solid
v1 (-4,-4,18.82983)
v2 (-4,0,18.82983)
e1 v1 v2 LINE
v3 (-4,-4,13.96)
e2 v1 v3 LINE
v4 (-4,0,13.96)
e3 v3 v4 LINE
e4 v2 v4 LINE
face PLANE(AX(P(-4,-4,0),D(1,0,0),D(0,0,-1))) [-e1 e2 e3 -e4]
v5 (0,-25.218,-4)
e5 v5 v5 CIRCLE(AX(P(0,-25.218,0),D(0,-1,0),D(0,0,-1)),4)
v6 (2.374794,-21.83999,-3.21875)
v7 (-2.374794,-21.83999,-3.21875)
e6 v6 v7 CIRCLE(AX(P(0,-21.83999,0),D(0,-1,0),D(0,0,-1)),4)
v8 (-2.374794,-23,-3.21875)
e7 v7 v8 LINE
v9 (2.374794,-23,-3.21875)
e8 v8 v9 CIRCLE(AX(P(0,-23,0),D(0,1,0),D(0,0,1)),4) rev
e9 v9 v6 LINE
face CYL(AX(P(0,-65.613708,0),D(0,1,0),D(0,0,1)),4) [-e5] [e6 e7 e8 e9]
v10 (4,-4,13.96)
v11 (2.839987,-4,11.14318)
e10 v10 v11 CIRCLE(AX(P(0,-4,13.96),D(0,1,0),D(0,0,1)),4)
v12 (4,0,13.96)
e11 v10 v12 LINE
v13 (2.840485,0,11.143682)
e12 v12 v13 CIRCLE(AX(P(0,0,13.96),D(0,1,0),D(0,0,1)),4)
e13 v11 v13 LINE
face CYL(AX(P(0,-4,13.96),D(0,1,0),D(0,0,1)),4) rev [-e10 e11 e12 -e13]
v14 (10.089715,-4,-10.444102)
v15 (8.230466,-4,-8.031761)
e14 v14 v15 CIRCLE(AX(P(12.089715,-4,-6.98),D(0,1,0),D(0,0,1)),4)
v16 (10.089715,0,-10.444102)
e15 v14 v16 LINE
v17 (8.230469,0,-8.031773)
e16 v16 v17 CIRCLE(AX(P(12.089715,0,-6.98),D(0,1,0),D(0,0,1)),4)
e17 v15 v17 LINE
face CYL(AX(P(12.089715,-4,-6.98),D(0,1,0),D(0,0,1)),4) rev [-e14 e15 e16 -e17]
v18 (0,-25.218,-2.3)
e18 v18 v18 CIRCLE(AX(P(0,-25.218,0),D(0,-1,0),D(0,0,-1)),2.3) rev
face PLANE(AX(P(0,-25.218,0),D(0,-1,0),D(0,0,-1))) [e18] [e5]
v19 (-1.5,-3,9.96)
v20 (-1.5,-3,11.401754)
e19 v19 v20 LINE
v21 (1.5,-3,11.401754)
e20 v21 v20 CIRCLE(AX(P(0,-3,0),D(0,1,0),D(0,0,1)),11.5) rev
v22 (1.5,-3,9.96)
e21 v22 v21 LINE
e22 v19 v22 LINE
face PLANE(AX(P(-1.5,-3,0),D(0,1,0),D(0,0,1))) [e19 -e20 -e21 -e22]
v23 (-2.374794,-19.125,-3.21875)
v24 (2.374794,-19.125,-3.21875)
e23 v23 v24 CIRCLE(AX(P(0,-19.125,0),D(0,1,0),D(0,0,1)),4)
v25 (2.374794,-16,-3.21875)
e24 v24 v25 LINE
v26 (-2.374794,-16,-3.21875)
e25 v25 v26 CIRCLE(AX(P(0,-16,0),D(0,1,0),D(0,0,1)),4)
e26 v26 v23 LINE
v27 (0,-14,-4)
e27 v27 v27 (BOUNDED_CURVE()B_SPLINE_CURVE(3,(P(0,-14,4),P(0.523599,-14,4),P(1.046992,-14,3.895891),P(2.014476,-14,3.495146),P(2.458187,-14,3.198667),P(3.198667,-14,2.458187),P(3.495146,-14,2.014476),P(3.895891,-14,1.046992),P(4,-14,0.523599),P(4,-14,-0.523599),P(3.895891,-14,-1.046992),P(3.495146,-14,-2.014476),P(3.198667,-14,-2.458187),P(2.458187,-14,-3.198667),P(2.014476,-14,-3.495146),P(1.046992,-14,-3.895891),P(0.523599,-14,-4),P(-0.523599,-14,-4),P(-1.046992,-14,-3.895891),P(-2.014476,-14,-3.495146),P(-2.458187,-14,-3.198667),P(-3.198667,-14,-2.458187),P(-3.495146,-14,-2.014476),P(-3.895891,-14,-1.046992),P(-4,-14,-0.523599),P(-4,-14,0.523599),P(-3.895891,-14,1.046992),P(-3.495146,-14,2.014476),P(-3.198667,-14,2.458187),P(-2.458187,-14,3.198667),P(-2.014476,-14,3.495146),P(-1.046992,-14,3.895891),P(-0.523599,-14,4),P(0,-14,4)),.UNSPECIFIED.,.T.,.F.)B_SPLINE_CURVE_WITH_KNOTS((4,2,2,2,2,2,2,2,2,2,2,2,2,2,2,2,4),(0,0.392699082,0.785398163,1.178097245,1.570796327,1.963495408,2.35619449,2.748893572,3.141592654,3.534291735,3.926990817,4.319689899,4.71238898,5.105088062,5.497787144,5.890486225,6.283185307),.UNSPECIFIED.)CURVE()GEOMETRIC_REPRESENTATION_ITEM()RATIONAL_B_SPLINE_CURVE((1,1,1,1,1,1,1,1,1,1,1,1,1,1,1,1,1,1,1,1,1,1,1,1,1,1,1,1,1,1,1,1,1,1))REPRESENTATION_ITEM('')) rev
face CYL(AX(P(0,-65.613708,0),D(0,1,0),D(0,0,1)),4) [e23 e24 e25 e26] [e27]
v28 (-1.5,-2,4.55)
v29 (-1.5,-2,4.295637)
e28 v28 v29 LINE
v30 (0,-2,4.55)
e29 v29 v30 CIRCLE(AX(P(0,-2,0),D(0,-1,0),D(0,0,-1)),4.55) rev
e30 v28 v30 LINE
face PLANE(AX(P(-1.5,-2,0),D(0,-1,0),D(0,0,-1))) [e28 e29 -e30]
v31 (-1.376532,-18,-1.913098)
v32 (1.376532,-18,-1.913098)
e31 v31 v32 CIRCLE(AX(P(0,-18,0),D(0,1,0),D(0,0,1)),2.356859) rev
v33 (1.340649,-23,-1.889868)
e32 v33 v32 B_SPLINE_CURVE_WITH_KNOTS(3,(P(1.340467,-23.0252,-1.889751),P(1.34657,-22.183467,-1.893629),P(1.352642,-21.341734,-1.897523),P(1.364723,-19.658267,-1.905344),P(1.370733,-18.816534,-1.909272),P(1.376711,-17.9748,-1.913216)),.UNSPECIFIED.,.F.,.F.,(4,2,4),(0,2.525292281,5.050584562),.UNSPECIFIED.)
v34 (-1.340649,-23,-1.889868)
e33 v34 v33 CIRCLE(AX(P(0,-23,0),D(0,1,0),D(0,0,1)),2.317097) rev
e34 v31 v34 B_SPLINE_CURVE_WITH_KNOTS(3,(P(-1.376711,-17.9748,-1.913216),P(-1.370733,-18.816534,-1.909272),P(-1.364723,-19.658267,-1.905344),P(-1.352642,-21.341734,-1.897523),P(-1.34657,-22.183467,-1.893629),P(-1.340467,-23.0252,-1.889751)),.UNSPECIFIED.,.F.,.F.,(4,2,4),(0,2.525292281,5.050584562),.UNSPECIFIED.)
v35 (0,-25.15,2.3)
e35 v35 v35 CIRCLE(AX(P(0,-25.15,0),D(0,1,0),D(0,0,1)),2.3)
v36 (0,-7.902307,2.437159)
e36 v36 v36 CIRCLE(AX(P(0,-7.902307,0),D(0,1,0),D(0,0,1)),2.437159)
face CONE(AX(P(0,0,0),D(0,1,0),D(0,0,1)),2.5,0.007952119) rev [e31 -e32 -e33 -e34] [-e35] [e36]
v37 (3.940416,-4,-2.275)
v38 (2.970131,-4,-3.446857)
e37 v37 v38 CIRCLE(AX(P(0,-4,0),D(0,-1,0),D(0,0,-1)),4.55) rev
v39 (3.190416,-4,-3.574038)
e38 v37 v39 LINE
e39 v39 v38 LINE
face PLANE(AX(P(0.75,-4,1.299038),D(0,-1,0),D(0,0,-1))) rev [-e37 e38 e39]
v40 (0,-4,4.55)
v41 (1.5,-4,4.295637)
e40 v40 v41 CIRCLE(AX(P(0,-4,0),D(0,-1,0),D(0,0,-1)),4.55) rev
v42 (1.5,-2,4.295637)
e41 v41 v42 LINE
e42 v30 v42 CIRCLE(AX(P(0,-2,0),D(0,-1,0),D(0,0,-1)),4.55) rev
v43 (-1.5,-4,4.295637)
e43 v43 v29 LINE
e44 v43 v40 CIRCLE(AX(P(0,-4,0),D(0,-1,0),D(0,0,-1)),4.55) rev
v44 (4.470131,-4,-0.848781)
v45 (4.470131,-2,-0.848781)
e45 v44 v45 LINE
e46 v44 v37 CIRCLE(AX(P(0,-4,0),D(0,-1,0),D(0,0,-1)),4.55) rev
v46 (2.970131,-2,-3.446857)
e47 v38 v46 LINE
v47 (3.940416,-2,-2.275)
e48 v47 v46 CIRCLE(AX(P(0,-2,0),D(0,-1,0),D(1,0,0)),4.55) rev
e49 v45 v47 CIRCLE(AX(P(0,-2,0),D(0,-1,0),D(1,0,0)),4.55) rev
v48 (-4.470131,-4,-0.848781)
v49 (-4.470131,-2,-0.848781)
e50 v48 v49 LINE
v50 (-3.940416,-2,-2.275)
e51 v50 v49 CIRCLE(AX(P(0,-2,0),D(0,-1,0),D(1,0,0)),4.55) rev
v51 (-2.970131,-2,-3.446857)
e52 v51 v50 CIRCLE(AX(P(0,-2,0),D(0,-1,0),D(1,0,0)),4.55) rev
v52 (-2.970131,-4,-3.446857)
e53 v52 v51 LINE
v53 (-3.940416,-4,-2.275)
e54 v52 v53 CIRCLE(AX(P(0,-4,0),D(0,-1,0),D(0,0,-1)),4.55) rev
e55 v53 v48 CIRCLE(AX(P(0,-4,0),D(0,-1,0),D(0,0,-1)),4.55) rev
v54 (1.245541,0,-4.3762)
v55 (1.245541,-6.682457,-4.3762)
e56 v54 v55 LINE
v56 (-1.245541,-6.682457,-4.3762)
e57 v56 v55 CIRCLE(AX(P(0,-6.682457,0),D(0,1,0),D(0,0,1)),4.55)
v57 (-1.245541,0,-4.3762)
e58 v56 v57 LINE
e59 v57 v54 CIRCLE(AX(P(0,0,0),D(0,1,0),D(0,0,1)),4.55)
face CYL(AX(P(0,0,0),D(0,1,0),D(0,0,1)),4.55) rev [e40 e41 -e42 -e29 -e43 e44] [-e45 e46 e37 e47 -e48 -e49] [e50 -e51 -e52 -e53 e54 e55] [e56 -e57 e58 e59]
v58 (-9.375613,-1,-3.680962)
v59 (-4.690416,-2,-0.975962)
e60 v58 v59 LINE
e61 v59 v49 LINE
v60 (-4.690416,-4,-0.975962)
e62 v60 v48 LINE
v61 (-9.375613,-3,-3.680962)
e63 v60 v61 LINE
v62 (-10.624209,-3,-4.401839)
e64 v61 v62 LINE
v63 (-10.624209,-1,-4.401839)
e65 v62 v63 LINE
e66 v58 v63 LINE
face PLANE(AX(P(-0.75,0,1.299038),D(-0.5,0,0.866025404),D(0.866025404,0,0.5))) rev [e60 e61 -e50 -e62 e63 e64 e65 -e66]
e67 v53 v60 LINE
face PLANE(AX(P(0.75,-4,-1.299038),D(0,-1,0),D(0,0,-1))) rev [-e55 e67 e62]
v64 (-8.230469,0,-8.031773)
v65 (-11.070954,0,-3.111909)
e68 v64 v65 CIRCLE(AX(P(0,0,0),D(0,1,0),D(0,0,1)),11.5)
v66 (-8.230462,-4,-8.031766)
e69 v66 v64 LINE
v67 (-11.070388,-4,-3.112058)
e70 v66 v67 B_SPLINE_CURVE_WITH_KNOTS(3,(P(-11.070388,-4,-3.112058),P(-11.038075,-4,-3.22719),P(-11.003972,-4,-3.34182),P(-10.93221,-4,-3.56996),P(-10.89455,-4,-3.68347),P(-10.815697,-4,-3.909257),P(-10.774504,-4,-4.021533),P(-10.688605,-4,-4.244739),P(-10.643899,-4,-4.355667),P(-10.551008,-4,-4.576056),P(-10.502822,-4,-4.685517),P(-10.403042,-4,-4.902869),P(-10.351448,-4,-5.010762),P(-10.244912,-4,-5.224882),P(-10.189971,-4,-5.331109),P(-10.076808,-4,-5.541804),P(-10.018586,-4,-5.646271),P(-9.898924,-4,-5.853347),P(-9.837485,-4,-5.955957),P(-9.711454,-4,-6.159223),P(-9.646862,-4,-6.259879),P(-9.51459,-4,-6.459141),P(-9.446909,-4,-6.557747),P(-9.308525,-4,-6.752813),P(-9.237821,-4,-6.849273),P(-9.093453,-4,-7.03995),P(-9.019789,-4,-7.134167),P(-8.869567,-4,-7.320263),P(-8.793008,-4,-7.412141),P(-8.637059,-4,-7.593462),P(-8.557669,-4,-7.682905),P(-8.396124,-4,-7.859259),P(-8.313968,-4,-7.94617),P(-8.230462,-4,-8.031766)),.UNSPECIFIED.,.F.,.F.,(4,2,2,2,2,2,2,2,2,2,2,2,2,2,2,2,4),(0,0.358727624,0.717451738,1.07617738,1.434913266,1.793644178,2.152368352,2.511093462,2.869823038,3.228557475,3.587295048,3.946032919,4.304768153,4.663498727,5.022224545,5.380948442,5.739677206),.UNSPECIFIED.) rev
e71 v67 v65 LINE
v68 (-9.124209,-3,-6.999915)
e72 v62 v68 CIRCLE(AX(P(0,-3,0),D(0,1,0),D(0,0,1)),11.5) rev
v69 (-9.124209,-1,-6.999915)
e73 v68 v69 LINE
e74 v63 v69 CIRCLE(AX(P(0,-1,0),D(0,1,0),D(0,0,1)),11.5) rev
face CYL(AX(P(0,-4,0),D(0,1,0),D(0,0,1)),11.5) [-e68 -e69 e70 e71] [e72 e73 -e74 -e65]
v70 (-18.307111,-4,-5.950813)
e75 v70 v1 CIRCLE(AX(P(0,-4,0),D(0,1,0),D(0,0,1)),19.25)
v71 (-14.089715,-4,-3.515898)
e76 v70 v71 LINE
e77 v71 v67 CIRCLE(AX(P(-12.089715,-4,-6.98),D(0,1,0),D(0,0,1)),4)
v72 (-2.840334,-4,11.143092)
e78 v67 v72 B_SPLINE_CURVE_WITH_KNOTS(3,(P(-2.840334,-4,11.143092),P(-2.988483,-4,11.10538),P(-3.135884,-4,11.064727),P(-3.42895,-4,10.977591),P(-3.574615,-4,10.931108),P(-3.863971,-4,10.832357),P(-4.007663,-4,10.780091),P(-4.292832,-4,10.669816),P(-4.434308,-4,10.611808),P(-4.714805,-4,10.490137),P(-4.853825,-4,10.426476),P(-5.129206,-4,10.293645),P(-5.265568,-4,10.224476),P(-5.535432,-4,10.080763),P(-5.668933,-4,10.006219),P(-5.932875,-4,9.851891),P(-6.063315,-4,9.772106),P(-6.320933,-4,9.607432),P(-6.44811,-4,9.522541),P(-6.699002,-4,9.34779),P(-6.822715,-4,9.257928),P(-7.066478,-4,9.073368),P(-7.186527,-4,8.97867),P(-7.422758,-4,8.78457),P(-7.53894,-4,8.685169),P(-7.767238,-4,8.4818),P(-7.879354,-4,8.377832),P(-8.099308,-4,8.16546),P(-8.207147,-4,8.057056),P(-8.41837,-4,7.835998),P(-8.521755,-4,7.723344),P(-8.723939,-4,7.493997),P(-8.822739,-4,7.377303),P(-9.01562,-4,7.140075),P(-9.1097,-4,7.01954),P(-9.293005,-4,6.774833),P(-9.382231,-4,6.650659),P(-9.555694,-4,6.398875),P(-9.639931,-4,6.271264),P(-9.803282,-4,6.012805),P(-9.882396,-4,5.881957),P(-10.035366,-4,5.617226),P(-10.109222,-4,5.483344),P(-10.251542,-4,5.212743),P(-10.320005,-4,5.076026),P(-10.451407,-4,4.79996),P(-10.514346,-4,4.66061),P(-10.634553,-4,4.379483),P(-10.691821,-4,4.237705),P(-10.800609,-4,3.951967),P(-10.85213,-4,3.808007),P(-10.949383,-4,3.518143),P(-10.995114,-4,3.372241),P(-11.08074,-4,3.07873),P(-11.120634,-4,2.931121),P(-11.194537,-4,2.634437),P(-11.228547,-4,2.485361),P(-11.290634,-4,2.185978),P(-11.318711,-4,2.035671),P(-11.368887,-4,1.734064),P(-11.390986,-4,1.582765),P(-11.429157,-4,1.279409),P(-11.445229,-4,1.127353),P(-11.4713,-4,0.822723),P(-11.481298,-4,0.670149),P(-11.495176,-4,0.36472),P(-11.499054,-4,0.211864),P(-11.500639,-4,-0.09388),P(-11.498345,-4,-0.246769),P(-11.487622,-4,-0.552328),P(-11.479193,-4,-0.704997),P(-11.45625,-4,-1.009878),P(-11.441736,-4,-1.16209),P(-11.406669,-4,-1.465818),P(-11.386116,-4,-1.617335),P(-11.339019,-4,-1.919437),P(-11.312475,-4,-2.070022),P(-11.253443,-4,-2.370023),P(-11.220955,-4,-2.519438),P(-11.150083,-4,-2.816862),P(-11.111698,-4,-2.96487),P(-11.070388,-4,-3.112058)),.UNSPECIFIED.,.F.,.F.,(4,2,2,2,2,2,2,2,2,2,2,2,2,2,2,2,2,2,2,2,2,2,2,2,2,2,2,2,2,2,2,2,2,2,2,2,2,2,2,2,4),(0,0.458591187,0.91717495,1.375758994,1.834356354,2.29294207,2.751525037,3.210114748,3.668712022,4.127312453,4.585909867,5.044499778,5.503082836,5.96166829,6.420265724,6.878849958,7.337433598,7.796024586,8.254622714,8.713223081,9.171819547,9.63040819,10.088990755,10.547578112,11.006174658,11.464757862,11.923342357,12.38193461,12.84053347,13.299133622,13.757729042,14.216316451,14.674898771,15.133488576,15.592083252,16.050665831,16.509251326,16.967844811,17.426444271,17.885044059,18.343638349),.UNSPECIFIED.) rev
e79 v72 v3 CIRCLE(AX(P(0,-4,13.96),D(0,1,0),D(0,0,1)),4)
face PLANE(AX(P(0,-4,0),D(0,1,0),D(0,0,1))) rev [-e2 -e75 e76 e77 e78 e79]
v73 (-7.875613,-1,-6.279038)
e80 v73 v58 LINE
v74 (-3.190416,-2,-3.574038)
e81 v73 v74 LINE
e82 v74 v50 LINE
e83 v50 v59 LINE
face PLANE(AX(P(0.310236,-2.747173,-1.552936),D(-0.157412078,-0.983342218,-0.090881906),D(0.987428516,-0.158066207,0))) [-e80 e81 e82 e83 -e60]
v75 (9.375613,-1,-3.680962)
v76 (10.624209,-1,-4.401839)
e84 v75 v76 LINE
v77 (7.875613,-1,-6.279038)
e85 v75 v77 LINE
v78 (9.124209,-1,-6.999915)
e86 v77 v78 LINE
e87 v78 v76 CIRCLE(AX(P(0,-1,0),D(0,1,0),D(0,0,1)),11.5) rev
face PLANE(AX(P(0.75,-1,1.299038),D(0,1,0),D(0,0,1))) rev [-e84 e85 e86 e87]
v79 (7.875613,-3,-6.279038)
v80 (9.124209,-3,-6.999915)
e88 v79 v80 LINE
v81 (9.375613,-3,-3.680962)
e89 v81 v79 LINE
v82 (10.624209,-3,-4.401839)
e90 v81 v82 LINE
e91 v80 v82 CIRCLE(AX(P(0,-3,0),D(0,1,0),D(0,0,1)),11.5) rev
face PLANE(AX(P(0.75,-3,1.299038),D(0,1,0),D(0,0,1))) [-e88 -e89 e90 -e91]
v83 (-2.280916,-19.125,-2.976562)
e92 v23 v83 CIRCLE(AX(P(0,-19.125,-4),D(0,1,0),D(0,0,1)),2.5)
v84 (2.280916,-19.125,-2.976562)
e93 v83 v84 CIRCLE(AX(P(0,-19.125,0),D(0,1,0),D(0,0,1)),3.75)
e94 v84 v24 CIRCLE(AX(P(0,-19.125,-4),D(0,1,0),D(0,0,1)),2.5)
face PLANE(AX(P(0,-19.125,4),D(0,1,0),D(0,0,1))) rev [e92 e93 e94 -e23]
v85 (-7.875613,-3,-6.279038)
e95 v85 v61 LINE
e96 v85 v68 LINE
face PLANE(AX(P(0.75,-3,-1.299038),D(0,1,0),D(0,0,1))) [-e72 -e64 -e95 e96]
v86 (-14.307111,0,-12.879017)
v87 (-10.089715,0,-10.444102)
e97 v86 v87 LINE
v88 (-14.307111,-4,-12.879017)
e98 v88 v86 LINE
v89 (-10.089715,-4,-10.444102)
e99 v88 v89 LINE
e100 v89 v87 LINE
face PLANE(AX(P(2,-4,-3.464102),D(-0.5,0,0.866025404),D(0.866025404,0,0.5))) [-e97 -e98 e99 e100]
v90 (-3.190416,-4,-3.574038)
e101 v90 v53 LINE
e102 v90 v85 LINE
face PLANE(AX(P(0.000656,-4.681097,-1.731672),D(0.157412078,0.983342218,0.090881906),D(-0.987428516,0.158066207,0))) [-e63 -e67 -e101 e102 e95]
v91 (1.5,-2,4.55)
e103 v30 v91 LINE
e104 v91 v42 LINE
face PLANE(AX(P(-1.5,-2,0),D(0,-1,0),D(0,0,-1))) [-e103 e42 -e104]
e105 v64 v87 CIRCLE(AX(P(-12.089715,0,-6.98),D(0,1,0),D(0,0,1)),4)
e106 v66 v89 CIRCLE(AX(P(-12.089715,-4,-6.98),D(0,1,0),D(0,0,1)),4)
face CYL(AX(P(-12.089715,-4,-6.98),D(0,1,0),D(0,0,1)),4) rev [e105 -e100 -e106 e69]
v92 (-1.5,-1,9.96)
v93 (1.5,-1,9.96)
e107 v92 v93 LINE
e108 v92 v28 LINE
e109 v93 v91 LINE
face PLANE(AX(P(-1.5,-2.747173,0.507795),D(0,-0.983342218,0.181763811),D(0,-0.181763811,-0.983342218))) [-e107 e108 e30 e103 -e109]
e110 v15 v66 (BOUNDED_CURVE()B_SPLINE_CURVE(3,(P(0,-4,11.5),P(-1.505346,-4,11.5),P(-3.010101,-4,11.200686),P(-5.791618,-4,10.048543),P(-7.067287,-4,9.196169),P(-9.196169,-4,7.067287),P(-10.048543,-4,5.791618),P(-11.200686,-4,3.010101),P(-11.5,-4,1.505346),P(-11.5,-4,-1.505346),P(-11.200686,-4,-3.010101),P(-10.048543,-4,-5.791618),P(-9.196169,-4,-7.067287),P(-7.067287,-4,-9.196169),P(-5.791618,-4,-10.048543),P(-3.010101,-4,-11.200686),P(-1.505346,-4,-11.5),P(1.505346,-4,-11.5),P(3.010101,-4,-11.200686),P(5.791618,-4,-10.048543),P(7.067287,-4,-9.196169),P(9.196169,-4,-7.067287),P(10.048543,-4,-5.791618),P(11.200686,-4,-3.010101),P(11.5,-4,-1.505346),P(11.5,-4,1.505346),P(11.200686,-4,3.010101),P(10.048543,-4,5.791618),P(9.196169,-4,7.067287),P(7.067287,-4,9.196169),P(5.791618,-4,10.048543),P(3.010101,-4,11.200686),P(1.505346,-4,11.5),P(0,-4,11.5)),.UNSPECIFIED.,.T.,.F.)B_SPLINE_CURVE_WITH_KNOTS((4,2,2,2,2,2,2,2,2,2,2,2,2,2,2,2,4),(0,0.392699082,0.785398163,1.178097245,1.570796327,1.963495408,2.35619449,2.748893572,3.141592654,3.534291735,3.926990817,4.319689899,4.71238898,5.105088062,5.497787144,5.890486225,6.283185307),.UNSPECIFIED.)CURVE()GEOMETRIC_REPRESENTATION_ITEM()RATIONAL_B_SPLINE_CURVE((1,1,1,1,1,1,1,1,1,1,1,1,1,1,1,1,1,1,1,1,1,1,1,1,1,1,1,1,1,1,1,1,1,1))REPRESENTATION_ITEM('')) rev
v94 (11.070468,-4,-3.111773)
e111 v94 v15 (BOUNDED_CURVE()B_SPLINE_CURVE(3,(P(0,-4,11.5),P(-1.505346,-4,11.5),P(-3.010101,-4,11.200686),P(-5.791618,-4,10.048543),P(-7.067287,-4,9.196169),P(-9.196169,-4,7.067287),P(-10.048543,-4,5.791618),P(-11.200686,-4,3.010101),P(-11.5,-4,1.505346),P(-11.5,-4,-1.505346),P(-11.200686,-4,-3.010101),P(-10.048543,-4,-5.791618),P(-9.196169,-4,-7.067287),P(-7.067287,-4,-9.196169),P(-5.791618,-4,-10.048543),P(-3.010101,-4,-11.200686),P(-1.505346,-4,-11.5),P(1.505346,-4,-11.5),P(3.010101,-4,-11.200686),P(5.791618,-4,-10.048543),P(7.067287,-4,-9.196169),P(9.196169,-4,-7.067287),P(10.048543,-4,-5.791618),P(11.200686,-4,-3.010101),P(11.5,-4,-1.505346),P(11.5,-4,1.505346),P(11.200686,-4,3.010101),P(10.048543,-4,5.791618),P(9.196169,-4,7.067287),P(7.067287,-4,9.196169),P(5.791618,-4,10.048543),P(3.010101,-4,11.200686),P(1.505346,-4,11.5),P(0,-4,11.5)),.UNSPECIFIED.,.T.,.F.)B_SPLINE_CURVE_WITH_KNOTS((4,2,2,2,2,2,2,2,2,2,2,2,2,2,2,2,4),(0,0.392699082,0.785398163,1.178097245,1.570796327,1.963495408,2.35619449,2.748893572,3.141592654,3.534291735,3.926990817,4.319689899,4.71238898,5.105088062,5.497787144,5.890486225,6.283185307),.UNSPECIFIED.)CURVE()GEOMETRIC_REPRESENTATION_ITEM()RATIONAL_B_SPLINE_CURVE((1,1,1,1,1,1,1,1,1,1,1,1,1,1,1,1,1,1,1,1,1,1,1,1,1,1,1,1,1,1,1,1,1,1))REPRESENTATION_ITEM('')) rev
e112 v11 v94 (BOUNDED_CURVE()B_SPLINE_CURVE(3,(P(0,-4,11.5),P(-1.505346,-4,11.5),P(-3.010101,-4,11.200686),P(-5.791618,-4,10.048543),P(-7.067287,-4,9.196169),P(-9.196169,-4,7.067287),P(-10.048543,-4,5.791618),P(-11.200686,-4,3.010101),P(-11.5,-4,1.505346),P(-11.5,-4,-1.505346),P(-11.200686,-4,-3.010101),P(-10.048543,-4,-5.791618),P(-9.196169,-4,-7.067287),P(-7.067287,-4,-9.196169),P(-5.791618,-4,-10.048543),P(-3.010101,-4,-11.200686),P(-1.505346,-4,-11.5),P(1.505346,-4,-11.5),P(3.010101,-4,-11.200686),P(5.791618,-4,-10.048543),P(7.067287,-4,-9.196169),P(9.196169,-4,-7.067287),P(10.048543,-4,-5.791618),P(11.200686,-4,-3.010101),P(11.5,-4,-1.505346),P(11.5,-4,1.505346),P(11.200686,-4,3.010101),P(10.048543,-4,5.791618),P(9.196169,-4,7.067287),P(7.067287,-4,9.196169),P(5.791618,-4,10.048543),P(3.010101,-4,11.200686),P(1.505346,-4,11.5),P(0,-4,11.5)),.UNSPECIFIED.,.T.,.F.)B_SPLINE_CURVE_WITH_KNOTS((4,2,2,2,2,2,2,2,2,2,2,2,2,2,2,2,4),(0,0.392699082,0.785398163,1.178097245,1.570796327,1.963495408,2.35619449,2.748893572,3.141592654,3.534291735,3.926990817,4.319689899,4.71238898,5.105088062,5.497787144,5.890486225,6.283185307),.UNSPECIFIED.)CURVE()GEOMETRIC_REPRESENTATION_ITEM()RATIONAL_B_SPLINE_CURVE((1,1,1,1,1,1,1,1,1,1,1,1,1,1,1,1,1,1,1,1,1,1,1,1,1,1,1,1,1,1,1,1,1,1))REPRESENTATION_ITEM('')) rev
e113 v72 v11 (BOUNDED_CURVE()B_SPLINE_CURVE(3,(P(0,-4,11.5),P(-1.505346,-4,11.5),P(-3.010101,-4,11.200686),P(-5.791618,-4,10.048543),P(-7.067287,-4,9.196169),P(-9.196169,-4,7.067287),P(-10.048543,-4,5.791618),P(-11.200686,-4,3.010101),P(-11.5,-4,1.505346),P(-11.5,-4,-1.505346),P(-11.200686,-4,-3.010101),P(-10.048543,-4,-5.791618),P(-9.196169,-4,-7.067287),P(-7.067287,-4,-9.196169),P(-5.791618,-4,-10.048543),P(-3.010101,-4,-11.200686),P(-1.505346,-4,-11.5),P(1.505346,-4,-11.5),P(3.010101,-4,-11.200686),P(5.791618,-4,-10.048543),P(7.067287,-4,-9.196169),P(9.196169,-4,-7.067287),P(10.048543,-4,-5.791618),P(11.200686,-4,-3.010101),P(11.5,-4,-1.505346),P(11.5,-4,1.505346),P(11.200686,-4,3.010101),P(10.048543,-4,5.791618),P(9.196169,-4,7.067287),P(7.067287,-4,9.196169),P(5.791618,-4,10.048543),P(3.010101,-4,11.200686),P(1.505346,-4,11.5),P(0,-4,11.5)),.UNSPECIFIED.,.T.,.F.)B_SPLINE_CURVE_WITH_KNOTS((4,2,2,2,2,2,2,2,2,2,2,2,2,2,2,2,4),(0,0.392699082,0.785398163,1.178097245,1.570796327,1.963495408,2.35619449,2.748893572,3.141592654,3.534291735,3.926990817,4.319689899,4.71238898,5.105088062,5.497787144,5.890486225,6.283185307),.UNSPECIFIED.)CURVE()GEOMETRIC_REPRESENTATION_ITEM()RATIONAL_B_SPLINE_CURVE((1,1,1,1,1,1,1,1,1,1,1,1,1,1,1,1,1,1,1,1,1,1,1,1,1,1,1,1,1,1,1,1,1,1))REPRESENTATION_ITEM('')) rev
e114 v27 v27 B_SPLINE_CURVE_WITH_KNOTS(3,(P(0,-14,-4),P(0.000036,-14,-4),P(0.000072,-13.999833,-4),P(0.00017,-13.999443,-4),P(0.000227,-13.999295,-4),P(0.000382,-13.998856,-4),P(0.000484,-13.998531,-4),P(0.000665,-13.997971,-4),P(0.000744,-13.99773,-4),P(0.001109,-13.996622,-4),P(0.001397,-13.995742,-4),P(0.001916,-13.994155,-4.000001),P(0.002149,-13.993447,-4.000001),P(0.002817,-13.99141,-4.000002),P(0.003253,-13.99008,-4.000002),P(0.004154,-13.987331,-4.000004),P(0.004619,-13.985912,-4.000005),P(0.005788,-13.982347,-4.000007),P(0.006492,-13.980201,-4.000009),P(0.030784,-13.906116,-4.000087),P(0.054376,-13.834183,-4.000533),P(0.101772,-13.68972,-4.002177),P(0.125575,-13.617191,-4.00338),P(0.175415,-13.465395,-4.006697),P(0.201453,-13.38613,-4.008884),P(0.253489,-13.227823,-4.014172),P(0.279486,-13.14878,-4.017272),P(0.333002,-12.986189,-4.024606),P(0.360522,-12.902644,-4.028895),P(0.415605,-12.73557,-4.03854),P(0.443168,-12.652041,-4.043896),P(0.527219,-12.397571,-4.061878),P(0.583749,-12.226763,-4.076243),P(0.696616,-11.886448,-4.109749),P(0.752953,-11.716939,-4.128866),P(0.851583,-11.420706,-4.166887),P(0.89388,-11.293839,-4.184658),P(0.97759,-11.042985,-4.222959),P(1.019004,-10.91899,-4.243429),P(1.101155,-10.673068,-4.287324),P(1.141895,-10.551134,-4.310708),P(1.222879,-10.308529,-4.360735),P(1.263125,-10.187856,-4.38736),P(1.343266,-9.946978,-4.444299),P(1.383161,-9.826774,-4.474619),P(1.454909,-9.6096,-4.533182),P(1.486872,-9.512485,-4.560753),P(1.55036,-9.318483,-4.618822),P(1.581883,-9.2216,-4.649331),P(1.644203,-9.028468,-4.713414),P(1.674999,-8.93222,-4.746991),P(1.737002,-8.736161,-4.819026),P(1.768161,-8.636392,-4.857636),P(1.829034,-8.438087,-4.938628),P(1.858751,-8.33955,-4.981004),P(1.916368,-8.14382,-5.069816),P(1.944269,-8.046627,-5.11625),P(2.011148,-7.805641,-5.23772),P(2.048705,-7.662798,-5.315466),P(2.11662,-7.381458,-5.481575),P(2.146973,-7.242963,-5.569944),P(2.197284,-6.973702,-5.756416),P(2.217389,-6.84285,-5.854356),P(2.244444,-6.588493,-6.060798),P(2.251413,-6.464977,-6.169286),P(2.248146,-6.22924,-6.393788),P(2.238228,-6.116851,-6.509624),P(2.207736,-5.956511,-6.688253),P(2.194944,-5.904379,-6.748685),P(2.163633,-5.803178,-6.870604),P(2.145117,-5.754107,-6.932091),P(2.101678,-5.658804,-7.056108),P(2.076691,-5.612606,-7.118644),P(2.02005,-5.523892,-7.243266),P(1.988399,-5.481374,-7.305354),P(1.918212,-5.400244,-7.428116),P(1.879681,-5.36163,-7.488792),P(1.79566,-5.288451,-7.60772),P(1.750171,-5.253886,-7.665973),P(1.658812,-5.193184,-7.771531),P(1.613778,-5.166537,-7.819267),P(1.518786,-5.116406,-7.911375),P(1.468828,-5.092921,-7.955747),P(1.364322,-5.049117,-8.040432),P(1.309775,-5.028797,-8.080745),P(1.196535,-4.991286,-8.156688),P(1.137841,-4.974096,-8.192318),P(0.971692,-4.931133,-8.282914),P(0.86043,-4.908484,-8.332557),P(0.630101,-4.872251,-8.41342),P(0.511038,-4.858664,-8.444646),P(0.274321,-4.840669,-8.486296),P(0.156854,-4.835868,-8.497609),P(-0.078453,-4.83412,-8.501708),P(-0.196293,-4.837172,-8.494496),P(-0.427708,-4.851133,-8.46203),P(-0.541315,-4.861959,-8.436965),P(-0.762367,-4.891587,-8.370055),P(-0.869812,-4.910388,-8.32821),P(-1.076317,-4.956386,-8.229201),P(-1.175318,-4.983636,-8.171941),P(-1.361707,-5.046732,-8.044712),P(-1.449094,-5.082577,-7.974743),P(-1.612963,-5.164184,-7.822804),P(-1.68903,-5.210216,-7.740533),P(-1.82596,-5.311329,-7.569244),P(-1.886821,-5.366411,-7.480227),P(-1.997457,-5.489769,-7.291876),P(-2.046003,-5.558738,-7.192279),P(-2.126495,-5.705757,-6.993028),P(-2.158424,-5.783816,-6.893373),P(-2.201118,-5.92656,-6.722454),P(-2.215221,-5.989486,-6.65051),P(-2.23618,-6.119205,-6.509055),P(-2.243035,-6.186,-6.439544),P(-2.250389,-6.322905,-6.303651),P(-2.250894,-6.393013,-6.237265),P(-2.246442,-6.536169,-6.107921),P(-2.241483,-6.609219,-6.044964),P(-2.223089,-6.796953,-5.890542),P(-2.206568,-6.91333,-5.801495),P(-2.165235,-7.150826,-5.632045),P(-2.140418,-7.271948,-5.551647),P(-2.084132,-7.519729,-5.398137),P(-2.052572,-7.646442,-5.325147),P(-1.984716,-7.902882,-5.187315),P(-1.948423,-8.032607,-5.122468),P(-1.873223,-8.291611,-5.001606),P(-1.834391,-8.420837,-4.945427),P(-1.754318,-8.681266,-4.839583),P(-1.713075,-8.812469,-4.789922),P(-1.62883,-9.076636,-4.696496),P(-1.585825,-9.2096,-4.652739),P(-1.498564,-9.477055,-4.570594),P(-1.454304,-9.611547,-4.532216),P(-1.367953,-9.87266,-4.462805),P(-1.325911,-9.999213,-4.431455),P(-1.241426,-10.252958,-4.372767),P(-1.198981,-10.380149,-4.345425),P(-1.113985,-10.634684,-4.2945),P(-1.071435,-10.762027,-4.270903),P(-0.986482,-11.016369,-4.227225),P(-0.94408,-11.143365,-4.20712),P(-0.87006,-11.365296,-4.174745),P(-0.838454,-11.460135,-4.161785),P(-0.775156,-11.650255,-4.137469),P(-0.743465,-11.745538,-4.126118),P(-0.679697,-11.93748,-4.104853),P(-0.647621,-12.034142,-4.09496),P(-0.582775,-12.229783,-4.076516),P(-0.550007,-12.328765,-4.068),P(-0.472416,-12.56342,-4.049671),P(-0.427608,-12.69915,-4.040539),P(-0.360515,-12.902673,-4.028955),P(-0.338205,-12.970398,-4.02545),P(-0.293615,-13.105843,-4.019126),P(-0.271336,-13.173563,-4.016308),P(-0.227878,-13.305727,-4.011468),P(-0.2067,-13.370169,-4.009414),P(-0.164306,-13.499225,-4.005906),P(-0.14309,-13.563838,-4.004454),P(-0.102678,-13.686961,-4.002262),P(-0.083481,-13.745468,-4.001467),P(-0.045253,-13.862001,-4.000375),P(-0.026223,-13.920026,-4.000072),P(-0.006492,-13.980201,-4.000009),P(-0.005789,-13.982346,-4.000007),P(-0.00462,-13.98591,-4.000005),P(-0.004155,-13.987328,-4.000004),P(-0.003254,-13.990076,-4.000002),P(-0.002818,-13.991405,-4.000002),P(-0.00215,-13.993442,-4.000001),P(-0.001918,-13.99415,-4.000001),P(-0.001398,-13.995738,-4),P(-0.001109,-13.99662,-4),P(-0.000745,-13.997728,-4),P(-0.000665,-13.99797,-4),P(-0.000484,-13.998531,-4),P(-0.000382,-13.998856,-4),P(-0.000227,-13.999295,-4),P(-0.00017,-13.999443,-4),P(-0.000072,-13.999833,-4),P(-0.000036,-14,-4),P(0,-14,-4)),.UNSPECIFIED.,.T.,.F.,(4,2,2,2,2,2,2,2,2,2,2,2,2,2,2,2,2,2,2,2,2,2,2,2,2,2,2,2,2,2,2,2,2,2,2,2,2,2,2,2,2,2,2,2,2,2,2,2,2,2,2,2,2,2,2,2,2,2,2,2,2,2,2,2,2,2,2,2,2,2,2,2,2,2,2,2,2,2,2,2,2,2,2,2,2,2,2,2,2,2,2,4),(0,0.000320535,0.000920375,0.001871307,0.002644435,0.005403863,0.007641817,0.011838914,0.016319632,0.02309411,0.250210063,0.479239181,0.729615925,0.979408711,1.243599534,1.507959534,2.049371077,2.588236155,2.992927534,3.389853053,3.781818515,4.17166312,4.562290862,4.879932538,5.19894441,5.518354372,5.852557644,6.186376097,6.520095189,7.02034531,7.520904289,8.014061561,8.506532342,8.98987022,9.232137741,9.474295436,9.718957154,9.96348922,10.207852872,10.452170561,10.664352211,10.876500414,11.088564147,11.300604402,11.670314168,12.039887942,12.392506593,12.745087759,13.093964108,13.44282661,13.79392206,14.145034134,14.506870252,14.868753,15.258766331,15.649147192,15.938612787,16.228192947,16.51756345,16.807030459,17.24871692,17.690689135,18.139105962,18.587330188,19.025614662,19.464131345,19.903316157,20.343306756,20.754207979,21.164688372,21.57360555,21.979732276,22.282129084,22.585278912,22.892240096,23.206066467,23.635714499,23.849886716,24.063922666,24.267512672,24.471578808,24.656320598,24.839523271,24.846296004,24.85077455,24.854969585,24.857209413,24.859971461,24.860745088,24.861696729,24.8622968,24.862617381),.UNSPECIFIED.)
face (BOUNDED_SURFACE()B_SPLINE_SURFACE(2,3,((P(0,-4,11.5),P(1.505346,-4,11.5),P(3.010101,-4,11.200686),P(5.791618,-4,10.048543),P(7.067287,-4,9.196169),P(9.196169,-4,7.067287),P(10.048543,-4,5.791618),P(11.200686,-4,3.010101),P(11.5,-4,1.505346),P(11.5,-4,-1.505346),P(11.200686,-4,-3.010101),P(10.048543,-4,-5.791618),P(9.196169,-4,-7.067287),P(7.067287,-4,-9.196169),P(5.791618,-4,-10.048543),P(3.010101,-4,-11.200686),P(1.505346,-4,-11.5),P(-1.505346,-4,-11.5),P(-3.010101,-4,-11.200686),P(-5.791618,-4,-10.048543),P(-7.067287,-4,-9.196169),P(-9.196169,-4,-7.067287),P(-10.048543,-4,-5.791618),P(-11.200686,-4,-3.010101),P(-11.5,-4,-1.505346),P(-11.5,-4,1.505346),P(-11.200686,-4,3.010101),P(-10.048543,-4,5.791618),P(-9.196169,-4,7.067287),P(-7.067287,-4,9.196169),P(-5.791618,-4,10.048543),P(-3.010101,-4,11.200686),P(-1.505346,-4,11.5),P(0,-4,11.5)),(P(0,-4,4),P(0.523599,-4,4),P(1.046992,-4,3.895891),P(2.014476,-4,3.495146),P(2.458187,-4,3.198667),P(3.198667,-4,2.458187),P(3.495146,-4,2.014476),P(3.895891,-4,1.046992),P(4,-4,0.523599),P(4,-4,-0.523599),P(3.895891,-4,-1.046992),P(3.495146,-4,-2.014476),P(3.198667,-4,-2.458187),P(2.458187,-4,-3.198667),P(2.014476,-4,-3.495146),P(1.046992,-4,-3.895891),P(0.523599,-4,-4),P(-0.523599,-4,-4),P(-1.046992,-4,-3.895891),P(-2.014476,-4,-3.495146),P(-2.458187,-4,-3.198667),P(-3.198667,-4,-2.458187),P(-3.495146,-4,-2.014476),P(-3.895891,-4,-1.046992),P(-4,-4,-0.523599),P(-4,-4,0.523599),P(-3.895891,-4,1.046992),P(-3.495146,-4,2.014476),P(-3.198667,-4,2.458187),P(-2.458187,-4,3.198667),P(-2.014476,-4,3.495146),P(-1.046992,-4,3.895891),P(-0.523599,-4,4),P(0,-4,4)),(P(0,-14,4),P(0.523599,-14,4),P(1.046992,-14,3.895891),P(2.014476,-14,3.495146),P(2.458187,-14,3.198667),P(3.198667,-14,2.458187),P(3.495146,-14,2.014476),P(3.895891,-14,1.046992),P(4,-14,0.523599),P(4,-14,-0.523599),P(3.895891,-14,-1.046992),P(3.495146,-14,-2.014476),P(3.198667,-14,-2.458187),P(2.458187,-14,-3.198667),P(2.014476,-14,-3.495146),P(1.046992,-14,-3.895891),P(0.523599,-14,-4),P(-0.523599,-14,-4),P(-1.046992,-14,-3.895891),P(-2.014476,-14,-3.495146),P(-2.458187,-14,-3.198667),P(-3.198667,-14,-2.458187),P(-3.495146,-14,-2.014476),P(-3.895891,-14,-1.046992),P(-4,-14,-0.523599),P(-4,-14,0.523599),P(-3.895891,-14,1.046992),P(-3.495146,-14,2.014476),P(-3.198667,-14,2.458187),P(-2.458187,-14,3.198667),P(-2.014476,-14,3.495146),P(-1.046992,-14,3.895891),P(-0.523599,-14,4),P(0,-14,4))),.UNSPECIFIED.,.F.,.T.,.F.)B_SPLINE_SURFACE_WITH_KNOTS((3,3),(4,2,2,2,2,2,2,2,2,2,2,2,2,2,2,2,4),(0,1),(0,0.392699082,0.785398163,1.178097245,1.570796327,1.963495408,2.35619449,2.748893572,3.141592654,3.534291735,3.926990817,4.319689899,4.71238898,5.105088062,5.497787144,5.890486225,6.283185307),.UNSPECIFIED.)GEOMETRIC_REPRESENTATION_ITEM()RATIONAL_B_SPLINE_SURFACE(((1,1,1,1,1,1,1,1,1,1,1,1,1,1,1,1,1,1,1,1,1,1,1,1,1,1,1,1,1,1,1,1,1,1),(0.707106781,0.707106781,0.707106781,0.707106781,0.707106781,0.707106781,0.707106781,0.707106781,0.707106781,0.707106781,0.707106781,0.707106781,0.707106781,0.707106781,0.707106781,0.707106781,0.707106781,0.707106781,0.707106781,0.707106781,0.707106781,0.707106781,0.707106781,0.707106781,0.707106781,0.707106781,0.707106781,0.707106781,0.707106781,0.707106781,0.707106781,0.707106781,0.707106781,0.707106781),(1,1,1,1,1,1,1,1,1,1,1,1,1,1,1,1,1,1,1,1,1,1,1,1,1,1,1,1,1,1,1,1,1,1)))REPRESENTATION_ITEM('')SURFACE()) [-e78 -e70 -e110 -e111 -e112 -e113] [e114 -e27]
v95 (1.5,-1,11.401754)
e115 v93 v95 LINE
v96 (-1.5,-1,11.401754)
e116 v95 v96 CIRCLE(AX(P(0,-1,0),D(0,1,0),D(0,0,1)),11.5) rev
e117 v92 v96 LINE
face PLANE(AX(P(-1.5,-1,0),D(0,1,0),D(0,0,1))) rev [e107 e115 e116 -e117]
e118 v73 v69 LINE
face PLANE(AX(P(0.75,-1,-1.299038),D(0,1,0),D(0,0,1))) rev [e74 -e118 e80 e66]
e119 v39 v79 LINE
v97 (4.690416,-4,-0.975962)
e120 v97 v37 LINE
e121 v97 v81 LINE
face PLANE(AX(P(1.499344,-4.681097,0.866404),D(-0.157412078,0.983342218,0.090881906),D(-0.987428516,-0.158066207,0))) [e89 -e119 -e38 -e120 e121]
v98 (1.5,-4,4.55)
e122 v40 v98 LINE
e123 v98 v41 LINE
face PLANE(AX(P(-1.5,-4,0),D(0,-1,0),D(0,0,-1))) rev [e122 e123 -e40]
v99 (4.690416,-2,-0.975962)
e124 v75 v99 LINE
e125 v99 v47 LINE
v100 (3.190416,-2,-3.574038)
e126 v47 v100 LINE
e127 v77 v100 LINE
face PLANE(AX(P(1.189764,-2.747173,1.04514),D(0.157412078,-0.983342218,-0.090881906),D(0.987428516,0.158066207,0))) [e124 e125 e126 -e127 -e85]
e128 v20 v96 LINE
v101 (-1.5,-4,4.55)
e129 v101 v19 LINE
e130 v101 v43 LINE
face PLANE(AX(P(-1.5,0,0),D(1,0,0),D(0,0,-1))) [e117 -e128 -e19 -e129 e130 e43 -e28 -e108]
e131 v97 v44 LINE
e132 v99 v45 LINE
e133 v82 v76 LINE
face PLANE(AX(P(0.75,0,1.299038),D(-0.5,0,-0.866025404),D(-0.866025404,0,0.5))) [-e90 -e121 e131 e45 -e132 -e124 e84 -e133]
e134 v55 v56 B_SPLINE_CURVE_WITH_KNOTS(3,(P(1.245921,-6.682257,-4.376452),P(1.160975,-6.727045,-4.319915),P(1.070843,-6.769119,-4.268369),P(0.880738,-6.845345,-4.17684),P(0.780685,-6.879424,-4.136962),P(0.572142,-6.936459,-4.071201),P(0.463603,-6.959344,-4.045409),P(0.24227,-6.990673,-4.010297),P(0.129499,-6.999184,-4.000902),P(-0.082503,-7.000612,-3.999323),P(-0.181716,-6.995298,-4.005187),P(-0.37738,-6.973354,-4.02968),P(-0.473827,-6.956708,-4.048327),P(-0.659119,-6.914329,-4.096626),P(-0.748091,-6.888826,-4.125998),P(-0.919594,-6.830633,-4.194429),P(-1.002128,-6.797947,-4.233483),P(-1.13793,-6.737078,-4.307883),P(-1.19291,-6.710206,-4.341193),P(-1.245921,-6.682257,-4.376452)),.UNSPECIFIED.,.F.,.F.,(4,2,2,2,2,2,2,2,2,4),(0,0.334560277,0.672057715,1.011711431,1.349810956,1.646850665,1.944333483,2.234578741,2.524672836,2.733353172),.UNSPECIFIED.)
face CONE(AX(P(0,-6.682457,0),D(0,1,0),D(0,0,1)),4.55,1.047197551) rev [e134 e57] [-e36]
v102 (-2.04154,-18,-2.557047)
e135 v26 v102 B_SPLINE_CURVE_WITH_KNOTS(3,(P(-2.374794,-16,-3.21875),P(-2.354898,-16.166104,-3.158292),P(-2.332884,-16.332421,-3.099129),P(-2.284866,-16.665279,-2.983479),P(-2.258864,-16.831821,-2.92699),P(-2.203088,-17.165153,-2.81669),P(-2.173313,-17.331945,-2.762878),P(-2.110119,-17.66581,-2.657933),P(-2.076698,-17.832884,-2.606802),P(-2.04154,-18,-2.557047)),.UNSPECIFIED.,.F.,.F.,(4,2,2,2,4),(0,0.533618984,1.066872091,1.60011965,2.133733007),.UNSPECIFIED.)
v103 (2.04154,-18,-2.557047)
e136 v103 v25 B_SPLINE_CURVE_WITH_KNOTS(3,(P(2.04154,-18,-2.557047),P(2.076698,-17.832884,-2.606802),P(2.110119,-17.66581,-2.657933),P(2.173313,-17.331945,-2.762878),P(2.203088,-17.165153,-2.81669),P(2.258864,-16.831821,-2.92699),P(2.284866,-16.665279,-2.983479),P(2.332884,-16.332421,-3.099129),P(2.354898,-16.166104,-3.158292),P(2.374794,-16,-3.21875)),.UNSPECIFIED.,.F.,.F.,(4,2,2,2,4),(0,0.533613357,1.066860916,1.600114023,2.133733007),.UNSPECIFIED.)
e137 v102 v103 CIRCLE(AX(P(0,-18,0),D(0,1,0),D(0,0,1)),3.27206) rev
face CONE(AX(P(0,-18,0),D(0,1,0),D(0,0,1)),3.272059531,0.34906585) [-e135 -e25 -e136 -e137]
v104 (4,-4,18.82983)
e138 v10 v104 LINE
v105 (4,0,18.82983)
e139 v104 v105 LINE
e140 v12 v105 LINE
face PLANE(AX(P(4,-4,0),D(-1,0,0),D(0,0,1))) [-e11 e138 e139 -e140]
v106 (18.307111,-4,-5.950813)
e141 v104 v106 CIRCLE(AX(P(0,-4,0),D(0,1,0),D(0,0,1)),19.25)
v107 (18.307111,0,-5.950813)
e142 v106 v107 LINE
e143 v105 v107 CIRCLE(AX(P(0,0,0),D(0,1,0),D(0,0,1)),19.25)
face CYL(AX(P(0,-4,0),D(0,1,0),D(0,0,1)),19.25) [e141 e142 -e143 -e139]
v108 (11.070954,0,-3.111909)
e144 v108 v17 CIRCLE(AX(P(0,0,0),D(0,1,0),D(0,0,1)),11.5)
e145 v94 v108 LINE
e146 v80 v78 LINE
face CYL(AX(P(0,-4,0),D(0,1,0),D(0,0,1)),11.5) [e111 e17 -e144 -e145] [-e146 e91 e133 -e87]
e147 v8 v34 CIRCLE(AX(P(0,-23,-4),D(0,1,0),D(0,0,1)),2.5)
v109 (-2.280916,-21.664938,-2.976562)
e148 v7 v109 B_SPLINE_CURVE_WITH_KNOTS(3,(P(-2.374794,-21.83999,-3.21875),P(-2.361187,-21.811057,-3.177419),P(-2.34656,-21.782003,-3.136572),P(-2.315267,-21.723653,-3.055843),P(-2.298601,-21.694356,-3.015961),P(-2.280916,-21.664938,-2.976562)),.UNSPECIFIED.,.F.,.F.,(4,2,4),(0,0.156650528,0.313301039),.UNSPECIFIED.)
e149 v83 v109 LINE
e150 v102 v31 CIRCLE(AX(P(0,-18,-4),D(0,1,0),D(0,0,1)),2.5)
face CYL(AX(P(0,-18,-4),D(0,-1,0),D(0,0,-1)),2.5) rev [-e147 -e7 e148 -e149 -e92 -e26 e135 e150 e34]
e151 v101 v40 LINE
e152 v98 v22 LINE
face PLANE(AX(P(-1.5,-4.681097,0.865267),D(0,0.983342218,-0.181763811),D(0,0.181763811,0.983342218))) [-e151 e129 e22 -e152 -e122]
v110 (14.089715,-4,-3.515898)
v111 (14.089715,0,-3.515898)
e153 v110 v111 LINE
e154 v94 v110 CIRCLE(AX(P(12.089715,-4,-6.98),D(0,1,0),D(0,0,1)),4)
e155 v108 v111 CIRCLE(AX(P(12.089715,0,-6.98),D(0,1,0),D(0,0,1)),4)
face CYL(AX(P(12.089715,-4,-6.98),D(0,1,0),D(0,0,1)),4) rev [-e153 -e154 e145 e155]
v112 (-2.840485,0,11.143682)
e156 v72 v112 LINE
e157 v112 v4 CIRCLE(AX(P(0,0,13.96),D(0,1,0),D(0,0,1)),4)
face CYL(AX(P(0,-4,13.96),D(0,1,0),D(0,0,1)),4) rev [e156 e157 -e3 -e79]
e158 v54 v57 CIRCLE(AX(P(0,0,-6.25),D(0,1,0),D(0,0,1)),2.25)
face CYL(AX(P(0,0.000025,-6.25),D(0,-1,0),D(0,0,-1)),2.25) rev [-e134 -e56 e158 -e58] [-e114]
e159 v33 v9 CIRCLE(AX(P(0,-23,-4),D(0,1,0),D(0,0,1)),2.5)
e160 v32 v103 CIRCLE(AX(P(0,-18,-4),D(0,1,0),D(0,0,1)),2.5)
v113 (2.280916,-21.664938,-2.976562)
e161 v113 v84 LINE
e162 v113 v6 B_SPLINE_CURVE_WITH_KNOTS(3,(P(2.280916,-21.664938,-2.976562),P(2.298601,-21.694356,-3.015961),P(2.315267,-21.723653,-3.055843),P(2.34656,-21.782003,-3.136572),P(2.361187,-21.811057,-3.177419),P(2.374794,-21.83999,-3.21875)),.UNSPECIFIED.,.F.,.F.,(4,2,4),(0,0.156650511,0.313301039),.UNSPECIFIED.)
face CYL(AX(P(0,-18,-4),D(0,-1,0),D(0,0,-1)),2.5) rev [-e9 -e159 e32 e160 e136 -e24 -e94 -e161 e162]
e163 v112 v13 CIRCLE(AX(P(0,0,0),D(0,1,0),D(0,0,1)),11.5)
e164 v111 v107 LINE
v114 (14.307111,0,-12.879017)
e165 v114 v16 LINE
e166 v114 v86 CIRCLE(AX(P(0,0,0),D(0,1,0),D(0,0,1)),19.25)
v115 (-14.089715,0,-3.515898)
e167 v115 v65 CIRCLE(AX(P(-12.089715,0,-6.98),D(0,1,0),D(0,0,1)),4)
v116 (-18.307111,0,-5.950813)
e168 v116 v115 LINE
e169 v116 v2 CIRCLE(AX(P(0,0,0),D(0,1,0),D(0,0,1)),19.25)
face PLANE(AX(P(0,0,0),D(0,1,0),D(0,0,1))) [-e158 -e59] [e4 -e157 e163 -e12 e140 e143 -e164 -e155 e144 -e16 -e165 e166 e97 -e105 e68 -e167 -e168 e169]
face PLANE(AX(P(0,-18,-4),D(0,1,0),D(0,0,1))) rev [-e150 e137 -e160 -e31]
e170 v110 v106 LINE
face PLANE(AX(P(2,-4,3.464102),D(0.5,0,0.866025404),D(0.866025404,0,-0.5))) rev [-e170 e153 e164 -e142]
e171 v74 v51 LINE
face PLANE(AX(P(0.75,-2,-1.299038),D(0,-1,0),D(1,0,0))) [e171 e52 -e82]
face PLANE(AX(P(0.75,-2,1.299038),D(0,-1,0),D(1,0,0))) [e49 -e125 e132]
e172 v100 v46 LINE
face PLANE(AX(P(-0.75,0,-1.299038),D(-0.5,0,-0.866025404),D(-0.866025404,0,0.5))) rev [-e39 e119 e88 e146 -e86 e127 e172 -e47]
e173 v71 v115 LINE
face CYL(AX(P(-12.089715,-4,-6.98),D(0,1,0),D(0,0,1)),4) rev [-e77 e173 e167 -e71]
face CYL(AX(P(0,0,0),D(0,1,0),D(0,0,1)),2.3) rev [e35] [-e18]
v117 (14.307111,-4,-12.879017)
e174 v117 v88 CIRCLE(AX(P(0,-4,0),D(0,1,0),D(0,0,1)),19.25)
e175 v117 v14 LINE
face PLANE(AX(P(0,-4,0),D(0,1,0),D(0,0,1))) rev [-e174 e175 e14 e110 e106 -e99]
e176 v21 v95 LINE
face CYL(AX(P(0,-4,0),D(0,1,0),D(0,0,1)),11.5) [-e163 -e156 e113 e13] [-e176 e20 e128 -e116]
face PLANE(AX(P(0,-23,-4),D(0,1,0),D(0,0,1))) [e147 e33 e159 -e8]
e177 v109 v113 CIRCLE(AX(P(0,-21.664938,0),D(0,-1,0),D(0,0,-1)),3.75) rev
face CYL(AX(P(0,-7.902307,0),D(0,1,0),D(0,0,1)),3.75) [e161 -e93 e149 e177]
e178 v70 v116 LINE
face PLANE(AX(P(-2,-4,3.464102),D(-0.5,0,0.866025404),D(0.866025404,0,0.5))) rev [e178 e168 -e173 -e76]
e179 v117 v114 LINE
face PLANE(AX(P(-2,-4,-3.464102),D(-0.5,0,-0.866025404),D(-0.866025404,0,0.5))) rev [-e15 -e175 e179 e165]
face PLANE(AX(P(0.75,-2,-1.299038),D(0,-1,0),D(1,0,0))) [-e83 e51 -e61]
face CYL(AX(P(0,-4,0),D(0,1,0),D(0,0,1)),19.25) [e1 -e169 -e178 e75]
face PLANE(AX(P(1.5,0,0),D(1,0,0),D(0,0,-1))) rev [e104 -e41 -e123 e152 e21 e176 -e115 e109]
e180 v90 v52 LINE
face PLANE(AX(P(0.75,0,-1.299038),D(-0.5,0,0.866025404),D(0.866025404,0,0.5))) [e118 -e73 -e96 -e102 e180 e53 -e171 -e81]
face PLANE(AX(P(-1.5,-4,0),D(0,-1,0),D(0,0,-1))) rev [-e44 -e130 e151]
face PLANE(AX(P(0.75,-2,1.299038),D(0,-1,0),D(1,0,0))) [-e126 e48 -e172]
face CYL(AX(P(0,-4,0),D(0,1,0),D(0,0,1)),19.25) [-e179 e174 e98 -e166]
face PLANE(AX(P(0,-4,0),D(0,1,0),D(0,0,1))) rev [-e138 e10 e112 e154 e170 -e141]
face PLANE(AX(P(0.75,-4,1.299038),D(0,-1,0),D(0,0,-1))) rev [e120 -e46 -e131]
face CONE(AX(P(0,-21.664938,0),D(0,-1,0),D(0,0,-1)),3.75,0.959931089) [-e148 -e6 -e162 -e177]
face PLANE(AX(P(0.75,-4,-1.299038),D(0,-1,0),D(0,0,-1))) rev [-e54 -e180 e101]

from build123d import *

# Parameters (mm, degrees)
BOSS_EXTRUDE1_DEPTH     = 4
SKETCH1_4_R             = 4
BOSS_EXTRUDE2_DEPTH     = 27.15
FILLET3_SIZE            = 7.5
FILLET3_SIZE_2          = 10
CUT_EXTRUDE1_START      = -1.932
SKETCH6_R               = 4
SKETCH6_R_2             = 3.356
CUT_EXTRUDE1_DEPTH      = 1.932
SKETCH8_R               = 2.5
CUT_EXTRUDE3_DEPTH      = 5
CHAMFER1_SIZE           = 2
CHAMFER1_SIZE2          = 0.727940469
CUT_EXTRUDE2_DEPTH      = 36.735801376
CUT_EXTRUDE2_DEPTH_BACK = 36.735801376
SKETCH7_R               = 2.25
SKETCH13_W              = 0.25
SKETCH13_H              = 2.75
CHAMFER4_SIZE           = 0.3
CHAMFER4_SIZE_2         = 0.210062261
SKETCH10_W              = 3
SKETCH10_H              = 2
CUT_EXTRUDE15_DEPTH     = 1.5
CIRPATTERN2_COUNT       = 3
CUT_EXTRUDE16_START     = -1.932
SKETCH14_R              = 3.356
SKETCH14_R_2            = 2.3
CUT_EXTRUDE16_DEPTH     = 1.932


with BuildPart() as part:
    # Sketch1 → Boss-Extrude1 (new body)
    with BuildSketch(Plane(origin=(0, 0, 0), x_dir=(1, 0, 0), z_dir=(0, 1, 0))):
        with BuildLine():
            Line((-14.089714637, 3.515898385), (-18.307111179, 5.950813414))
            ThreePointArc((-18.307111179, 5.950813414), (-16.670989023, -9.625), (-4, -18.829830058))
            Line((-4, -18.829830058), (-4, -13.96))
            ThreePointArc((-4, -13.96), (-3.698779414, -12.437163552), (-2.840484577, -11.143681948))
            ThreePointArc((-2.840484577, -11.143681948), (0, -11.5), (2.840484577, -11.143681948))
            ThreePointArc((2.840484577, -11.143681948), (3.698779414, -12.437163552), (4, -13.96))
            Line((4, -13.96), (4, -18.829830058))
            ThreePointArc((4, -18.829830058), (16.670989023, -9.625), (18.307111179, 5.950813414))
            Line((18.307111179, 5.950813414), (14.089714637, 3.515898385))
            ThreePointArc((14.089714637, 3.515898385), (12.620289295, 3.015344841), (11.070953948, 3.111909171))
            ThreePointArc((11.070953948, 3.111909171), (9.959292144, 5.75), (8.230469371, 8.031772777))
            ThreePointArc((8.230469371, 8.031772777), (8.92150988, 9.421818712), (10.089714637, 10.444101615))
            Line((10.089714637, 10.444101615), (14.307111179, 12.879016644))
            ThreePointArc((14.307111179, 12.879016644), (0, 19.25), (-14.307111179, 12.879016644))
            Line((-14.307111179, 12.879016644), (-10.089714637, 10.444101615))
            ThreePointArc((-10.089714637, 10.444101615), (-8.92150988, 9.421818712), (-8.230469371, 8.031772777))
            ThreePointArc((-8.230469371, 8.031772777), (-9.959292144, 5.75), (-11.070953948, 3.111909171))
            ThreePointArc((-11.070953948, 3.111909171), (-12.620289295, 3.015344841), (-14.089714637, 3.515898385))
        make_face()
    extrude(amount=-BOSS_EXTRUDE1_DEPTH)

    # Sketch1<4> → Boss-Extrude2 (add)
    with BuildSketch(Plane(origin=(0, 0, 0), x_dir=(1, 0, 0), z_dir=(0, 1, 0))):
        with Locations(Location((0, 0, 0), (0, 0, 270))):
            Circle(SKETCH1_4_R)
    extrude(amount=-BOSS_EXTRUDE2_DEPTH)

    # Sketch2 → Cut-Revolve4 (revolve, cut)
    with BuildSketch(Plane(origin=(0, 0, 0), x_dir=(0, 0, -1), z_dir=(1, 0, 0)), mode=Mode.PRIVATE) as cut_revolve4_sk:
        Polygon((0, -27.15), (2.3, -27.15), (2.3, -25.15), (2.5, 0), (0, 0), align=None)
    revolve(cut_revolve4_sk.sketch.rotate(Axis((0, 0, 0), (0, -1, 0)), 180), axis=Axis((0, 0, 0), (0, -1, 0)), mode=Mode.SUBTRACT)

    # Fillet3
    # an asymmetric fillet: 10, 7.5 mm, written as the material it adds along each edge
    with BuildSketch(Plane(origin=(0, -4, 0), x_dir=(0, 0, 1), z_dir=(-1, 0, 0))) as fillet3_piece_1_section:
        with BuildLine():
            Bezier((4 + FILLET3_SIZE, 0), (4, 0), (4, -FILLET3_SIZE_2), weights=[1, 0.707106781, 1])
            Line((4, -FILLET3_SIZE_2), (4, 0))
            Line((4, 0), (4 + FILLET3_SIZE, 0))
        make_face()
    fillet3_piece_1 = revolve(axis=Axis((0, -4, 0), (0, 1, 0)), mode=Mode.PRIVATE)
    fillet3_piece_1 = fillet3_piece_1 & Plane(origin=(0, -3.929777006, 0), x_dir=(-0.7156929887401748, 0, -0.6984150240853615), z_dir=(0, 1, 0)) * Cylinder(11.5, 46, mode=Mode.PRIVATE)
    add(fillet3_piece_1)

    # Sketch5 → Cut-Revolve8 (revolve, cut)
    with BuildSketch(Plane.XY, mode=Mode.PRIVATE) as cut_revolve8_sk:
        Polygon((0, -7), (0, -9.309401077), (-4.55, -6.682457352), (-4.55, 0), (-2.55, 0), (-2.55, -5.527756814), align=None)
        Polygon((0, 0), (0, -7), (-2.55, -5.527756814), (-2.55, 0), align=None)
    revolve(cut_revolve8_sk.sketch.rotate(Axis((0, 0, 0), (0, -1, 0)), 270), axis=Axis((0, 0, 0), (0, -1, 0)), mode=Mode.SUBTRACT)

    # Sketch6 → Cut-Extrude1 (cut)
    with BuildSketch(Plane.XZ.offset(27.15).offset(CUT_EXTRUDE1_START)):
        with Locations(Location((0, 0, 0), (0, 0, 90))):
            Circle(SKETCH6_R)
        with Locations(Location((0, 0, 0), (0, 0, 270))):
            Circle(SKETCH6_R_2, mode=Mode.SUBTRACT)
    extrude(amount=CUT_EXTRUDE1_DEPTH, mode=Mode.SUBTRACT)

    # Sketch8 → Cut-Extrude3 (cut)
    with BuildSketch(Plane(origin=(0, -23, 0), x_dir=(1, 0, 0), z_dir=(0, 1, 0))):
        with Locations((0, 4)):
            Circle(SKETCH8_R)
    extrude(amount=CUT_EXTRUDE3_DEPTH, mode=Mode.SUBTRACT)

    # Chamfer1
    chamfer1_edges = [part.edges().sort_by_distance(p)[0] for p in [
        (0, -18, -4),
    ]]
    chamfer1_side = [part.faces().sort_by_distance(p)[0] for p in [
        (0, -19.609, -4),
    ]]
    chamfer(chamfer1_edges, length=CHAMFER1_SIZE, length2=CHAMFER1_SIZE2, reference=chamfer1_side[0])

    # Sketch7 → Cut-Extrude2 (cut, two sides: drawn at the far end of the back side and taken through both)
    with BuildSketch(Plane.XZ.offset(4).offset(-CUT_EXTRUDE2_DEPTH_BACK)):
        with Locations(Location((0, -6.25, 0), (0, 0, 56.387449327))):
            Circle(SKETCH7_R)
    extrude(amount=CUT_EXTRUDE2_DEPTH + CUT_EXTRUDE2_DEPTH_BACK, mode=Mode.SUBTRACT)

    # Sketch13 → Cut-Revolve14 (revolve, cut)
    with BuildSketch(Plane(origin=(0, 0, 0), x_dir=(0, 0, -1), z_dir=(1, 0, 0)), mode=Mode.PRIVATE) as cut_revolve14_sk:
        with Locations((-3.875, -20.5)):
            Rectangle(SKETCH13_W, SKETCH13_H)
    revolve(cut_revolve14_sk.sketch.rotate(Axis((0, -7.902306907, 0), (0, -1, 0)), 216.419913729), axis=Axis((0, -7.902306907, 0), (0, -1, 0)), mode=Mode.SUBTRACT)

    # Chamfer4
    # the kernel refuses this chamfer: 0.3, 0.210062261 mm, written as the material it adds along each edge
    with BuildSketch(Plane(origin=(0, -21.875, 0), x_dir=(0.43172798800380885, 0, -0.9020038494231514), z_dir=(-0.9020038494231514, 0, -0.43172798800380885))) as chamfer4_piece_1_section:
        Polygon((3.75 + CHAMFER4_SIZE, 0), (3.75, -CHAMFER4_SIZE_2 * 1.0000000022), (3.75, 0), align=None)
    chamfer4_piece_1 = revolve(axis=Axis((0, -21.875, 0), (0, -1, 0)), revolution_arc=308.845454641, mode=Mode.PRIVATE)
    chamfer4_piece_1 = chamfer4_piece_1 & Plane(origin=(0, -21.756112084, 0), x_dir=(0, 0, 1), z_dir=(0, 1, 0)) * Cylinder(4, 17, mode=Mode.PRIVATE)
    chamfer4_piece_1 = chamfer4_piece_1 - Plane(origin=(0, -21.756112084, -4), x_dir=(1, 0, 0), z_dir=(0, -1, 0)) * Cylinder(2.5, 17, mode=Mode.PRIVATE)
    add(chamfer4_piece_1)

    # Sketch10 → Cut-Extrude15 (cut, symmetric)
    with BuildSketch(Plane(origin=(0, 0, 0), x_dir=(0, 0, -1), z_dir=(1, 0, 0))):
        with Locations((-11.46, -2)):
            Rectangle(SKETCH10_W, SKETCH10_H)
        Polygon((-4.55, -4), (-9.96, -3), (-9.96, -1), (-4.55, -2), align=None)
        with Locations((-3.05, -3)):
            Rectangle(SKETCH10_W, SKETCH10_H)
    cut_extrude15 = extrude(amount=CUT_EXTRUDE15_DEPTH, both=True, mode=Mode.SUBTRACT)

    # CirPattern2: Cut-Extrude15 ×3 about axis
    cirpattern2_axis = Axis((0, 0, 0), (0, 1, 0))
    for i in range(1, CIRPATTERN2_COUNT):
        add(cut_extrude15.rotate(cirpattern2_axis, i * 360 / CIRPATTERN2_COUNT), mode=Mode.SUBTRACT)

    # Sketch14 → Cut-Extrude16 (cut)
    with BuildSketch(Plane.XZ.offset(27.15).offset(CUT_EXTRUDE16_START)):
        Circle(SKETCH14_R)
        with Locations(Location((0, 0, 0), (0, 0, 90))):
            Circle(SKETCH14_R_2, mode=Mode.SUBTRACT)
    extrude(amount=CUT_EXTRUDE16_DEPTH, mode=Mode.SUBTRACT)


solid = part.part
